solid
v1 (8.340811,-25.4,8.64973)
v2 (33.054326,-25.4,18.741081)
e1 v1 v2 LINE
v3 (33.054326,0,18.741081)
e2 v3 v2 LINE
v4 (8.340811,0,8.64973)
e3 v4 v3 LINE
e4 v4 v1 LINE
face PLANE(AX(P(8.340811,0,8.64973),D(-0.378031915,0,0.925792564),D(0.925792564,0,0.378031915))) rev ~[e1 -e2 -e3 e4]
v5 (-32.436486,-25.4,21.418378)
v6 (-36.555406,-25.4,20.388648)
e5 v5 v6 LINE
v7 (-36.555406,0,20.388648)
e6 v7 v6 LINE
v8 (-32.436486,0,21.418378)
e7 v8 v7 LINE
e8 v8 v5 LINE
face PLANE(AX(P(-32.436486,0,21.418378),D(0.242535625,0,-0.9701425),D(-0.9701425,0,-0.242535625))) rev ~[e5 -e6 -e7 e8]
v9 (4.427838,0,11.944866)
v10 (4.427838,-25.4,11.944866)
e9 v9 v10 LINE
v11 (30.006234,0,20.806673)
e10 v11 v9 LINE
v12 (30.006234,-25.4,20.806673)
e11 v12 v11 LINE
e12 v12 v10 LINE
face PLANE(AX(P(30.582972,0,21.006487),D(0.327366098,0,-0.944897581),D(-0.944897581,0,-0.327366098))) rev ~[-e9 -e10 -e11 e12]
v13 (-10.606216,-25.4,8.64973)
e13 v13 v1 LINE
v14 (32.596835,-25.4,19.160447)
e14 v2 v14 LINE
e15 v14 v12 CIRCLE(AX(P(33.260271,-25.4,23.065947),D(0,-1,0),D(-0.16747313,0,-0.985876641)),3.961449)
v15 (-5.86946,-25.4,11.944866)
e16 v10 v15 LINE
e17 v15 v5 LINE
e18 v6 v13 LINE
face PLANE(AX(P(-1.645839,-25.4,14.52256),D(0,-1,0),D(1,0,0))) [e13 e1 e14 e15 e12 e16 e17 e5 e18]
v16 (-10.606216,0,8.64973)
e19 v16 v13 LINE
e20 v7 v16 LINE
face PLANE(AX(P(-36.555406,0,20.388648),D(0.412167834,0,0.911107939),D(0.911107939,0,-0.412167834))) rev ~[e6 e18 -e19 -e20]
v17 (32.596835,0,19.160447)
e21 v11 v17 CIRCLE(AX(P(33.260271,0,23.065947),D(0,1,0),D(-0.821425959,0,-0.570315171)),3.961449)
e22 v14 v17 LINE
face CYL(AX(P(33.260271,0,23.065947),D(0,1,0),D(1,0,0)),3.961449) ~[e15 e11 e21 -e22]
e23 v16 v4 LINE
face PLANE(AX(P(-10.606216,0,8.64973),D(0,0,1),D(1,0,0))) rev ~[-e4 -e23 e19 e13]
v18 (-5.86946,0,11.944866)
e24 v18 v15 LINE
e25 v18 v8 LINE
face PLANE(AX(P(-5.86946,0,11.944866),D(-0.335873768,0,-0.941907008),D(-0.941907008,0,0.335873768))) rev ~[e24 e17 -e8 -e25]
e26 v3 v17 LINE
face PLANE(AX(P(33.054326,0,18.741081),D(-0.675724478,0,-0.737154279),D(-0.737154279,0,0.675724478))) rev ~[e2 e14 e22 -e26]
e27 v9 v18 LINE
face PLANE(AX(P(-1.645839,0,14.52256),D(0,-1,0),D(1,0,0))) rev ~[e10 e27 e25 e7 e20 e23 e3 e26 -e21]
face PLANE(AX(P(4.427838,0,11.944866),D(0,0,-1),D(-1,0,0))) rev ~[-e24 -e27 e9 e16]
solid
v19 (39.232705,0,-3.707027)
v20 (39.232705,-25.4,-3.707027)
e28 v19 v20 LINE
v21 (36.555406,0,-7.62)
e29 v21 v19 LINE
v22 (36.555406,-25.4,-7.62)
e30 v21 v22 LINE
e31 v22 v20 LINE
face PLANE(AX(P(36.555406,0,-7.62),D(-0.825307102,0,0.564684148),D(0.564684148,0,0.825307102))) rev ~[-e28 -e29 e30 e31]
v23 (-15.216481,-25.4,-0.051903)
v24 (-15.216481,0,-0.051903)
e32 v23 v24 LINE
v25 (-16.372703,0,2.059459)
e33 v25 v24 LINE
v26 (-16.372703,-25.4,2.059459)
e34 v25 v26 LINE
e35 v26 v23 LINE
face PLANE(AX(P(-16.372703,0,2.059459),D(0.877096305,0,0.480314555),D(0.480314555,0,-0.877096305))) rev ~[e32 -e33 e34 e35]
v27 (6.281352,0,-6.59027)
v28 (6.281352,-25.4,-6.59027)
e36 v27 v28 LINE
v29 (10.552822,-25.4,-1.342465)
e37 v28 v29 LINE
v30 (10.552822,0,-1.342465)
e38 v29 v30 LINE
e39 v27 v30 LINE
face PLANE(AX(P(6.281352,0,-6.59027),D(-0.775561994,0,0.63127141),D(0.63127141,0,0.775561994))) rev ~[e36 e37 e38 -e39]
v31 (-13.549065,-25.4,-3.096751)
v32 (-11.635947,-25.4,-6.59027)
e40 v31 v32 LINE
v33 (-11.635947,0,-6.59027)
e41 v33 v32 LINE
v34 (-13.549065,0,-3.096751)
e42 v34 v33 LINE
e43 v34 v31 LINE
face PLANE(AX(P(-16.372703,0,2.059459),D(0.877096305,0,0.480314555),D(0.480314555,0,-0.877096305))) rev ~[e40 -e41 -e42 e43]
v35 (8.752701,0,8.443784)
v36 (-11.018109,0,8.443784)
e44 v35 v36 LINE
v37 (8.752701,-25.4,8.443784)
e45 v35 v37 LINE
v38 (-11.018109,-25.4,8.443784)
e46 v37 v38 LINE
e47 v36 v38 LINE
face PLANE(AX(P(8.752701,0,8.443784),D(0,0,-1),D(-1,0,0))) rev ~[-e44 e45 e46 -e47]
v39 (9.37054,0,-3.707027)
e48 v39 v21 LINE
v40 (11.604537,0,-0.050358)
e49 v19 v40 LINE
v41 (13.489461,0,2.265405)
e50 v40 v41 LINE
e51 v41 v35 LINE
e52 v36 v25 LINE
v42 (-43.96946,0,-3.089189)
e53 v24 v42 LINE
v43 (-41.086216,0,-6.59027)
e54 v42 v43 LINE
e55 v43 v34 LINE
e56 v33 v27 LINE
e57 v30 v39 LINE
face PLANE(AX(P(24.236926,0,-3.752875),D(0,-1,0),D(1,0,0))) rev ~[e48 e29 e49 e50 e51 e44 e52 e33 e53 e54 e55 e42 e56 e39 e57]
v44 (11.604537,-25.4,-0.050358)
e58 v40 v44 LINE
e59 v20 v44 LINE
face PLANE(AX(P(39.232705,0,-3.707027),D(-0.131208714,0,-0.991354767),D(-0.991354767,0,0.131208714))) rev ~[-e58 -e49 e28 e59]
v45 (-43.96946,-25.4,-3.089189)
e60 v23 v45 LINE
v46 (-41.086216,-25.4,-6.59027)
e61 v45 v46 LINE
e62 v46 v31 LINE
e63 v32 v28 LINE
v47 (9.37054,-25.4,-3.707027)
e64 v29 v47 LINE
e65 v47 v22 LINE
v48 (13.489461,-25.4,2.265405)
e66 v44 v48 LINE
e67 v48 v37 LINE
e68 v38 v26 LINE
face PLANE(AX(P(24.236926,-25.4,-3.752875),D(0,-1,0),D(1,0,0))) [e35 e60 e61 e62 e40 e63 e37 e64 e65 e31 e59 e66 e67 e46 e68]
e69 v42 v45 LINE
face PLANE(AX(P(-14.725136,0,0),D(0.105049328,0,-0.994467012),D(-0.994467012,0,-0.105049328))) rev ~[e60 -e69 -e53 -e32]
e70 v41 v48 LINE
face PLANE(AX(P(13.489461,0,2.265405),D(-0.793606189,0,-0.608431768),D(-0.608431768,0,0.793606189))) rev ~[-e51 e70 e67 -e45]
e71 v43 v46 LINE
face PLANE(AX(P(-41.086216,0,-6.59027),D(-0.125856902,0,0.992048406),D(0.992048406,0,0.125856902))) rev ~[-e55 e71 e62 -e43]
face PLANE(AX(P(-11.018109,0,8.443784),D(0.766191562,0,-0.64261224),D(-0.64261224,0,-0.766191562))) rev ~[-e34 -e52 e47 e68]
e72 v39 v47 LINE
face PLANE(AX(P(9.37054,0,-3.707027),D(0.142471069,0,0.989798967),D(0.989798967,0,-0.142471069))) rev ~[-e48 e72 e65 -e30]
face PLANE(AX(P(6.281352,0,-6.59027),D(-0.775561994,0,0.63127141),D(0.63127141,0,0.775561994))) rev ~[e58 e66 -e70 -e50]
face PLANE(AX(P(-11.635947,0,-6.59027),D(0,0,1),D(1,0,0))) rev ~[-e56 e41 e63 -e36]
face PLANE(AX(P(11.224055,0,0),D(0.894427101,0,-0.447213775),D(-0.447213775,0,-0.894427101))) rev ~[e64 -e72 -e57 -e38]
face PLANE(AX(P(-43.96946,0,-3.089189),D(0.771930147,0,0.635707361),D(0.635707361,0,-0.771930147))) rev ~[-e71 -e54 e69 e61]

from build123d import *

# Parameters (mm, degrees)
F2_R      = 3.9614488342
F3_DEPTH  = 25.4
F5_DEPTH  = 25.4
F7_DEPTH  = 25.4
F9_DEPTH  = 25.4
F11_DEPTH = 25.4


# Not quite as in the source:
# - the program builds the solid bodies; features that only make, move or delete a surface that nothing else refers to are left out


with BuildPart() as f3:
    # F2 (on Front) → F3 (new body)
    with BuildSketch(Plane.XZ):
        with Locations((33.2602709532, 23.0659469962)):
            Circle(F2_R)
    extrude(amount=F3_DEPTH)

    # F4 (on Front) → F5 (join)
    with BuildSketch(Plane.XZ):
        Polygon((-5.8694598265, 11.9448658079), (-32.4364863336, 21.4183777571), (-36.5554057062, 20.3886479139), (-10.6062162668, 8.6497301236), (8.3408113569, 8.6497301236), (33.0543257296, 18.7410805374), (30.5829718709, 21.0064873099), (4.4278376736, 11.9448658079), align=None)
    extrude(amount=F5_DEPTH)


with BuildPart() as f7:
    # F6 (on Front) → F7 (new body)
    with BuildSketch(Plane.XZ):
        Polygon((8.7527008727, 8.4437839687), (-11.0181085765, 8.4437839687), (-16.3727030158, 2.0594594534), (-11.6359470412, -6.5902704373), (6.2813521363, -6.5902704373), (13.4894605726, 2.2654053755), align=None)
    extrude(amount=F7_DEPTH)

    # F8 (on Front) → F9 (join)
    with BuildSketch(Plane.XZ):
        Polygon((-13.4894596413, -3.0891890638), (-14.7251356393, 0), (-43.9694598317, -3.0891890638), (-41.0862155259, -6.5902704373), align=None)
    extrude(amount=F9_DEPTH)

    # F10 (on Front) → F11 (join)
    with BuildSketch(Plane.XZ):
        Polygon((39.2327047884, -3.7070270628), (11.2240547314, 0), (9.3705402687, -3.7070270628), (36.5554057062, -7.6200002804), align=None)
    extrude(amount=F11_DEPTH)


solid = Compound([f3.part, f7.part])
